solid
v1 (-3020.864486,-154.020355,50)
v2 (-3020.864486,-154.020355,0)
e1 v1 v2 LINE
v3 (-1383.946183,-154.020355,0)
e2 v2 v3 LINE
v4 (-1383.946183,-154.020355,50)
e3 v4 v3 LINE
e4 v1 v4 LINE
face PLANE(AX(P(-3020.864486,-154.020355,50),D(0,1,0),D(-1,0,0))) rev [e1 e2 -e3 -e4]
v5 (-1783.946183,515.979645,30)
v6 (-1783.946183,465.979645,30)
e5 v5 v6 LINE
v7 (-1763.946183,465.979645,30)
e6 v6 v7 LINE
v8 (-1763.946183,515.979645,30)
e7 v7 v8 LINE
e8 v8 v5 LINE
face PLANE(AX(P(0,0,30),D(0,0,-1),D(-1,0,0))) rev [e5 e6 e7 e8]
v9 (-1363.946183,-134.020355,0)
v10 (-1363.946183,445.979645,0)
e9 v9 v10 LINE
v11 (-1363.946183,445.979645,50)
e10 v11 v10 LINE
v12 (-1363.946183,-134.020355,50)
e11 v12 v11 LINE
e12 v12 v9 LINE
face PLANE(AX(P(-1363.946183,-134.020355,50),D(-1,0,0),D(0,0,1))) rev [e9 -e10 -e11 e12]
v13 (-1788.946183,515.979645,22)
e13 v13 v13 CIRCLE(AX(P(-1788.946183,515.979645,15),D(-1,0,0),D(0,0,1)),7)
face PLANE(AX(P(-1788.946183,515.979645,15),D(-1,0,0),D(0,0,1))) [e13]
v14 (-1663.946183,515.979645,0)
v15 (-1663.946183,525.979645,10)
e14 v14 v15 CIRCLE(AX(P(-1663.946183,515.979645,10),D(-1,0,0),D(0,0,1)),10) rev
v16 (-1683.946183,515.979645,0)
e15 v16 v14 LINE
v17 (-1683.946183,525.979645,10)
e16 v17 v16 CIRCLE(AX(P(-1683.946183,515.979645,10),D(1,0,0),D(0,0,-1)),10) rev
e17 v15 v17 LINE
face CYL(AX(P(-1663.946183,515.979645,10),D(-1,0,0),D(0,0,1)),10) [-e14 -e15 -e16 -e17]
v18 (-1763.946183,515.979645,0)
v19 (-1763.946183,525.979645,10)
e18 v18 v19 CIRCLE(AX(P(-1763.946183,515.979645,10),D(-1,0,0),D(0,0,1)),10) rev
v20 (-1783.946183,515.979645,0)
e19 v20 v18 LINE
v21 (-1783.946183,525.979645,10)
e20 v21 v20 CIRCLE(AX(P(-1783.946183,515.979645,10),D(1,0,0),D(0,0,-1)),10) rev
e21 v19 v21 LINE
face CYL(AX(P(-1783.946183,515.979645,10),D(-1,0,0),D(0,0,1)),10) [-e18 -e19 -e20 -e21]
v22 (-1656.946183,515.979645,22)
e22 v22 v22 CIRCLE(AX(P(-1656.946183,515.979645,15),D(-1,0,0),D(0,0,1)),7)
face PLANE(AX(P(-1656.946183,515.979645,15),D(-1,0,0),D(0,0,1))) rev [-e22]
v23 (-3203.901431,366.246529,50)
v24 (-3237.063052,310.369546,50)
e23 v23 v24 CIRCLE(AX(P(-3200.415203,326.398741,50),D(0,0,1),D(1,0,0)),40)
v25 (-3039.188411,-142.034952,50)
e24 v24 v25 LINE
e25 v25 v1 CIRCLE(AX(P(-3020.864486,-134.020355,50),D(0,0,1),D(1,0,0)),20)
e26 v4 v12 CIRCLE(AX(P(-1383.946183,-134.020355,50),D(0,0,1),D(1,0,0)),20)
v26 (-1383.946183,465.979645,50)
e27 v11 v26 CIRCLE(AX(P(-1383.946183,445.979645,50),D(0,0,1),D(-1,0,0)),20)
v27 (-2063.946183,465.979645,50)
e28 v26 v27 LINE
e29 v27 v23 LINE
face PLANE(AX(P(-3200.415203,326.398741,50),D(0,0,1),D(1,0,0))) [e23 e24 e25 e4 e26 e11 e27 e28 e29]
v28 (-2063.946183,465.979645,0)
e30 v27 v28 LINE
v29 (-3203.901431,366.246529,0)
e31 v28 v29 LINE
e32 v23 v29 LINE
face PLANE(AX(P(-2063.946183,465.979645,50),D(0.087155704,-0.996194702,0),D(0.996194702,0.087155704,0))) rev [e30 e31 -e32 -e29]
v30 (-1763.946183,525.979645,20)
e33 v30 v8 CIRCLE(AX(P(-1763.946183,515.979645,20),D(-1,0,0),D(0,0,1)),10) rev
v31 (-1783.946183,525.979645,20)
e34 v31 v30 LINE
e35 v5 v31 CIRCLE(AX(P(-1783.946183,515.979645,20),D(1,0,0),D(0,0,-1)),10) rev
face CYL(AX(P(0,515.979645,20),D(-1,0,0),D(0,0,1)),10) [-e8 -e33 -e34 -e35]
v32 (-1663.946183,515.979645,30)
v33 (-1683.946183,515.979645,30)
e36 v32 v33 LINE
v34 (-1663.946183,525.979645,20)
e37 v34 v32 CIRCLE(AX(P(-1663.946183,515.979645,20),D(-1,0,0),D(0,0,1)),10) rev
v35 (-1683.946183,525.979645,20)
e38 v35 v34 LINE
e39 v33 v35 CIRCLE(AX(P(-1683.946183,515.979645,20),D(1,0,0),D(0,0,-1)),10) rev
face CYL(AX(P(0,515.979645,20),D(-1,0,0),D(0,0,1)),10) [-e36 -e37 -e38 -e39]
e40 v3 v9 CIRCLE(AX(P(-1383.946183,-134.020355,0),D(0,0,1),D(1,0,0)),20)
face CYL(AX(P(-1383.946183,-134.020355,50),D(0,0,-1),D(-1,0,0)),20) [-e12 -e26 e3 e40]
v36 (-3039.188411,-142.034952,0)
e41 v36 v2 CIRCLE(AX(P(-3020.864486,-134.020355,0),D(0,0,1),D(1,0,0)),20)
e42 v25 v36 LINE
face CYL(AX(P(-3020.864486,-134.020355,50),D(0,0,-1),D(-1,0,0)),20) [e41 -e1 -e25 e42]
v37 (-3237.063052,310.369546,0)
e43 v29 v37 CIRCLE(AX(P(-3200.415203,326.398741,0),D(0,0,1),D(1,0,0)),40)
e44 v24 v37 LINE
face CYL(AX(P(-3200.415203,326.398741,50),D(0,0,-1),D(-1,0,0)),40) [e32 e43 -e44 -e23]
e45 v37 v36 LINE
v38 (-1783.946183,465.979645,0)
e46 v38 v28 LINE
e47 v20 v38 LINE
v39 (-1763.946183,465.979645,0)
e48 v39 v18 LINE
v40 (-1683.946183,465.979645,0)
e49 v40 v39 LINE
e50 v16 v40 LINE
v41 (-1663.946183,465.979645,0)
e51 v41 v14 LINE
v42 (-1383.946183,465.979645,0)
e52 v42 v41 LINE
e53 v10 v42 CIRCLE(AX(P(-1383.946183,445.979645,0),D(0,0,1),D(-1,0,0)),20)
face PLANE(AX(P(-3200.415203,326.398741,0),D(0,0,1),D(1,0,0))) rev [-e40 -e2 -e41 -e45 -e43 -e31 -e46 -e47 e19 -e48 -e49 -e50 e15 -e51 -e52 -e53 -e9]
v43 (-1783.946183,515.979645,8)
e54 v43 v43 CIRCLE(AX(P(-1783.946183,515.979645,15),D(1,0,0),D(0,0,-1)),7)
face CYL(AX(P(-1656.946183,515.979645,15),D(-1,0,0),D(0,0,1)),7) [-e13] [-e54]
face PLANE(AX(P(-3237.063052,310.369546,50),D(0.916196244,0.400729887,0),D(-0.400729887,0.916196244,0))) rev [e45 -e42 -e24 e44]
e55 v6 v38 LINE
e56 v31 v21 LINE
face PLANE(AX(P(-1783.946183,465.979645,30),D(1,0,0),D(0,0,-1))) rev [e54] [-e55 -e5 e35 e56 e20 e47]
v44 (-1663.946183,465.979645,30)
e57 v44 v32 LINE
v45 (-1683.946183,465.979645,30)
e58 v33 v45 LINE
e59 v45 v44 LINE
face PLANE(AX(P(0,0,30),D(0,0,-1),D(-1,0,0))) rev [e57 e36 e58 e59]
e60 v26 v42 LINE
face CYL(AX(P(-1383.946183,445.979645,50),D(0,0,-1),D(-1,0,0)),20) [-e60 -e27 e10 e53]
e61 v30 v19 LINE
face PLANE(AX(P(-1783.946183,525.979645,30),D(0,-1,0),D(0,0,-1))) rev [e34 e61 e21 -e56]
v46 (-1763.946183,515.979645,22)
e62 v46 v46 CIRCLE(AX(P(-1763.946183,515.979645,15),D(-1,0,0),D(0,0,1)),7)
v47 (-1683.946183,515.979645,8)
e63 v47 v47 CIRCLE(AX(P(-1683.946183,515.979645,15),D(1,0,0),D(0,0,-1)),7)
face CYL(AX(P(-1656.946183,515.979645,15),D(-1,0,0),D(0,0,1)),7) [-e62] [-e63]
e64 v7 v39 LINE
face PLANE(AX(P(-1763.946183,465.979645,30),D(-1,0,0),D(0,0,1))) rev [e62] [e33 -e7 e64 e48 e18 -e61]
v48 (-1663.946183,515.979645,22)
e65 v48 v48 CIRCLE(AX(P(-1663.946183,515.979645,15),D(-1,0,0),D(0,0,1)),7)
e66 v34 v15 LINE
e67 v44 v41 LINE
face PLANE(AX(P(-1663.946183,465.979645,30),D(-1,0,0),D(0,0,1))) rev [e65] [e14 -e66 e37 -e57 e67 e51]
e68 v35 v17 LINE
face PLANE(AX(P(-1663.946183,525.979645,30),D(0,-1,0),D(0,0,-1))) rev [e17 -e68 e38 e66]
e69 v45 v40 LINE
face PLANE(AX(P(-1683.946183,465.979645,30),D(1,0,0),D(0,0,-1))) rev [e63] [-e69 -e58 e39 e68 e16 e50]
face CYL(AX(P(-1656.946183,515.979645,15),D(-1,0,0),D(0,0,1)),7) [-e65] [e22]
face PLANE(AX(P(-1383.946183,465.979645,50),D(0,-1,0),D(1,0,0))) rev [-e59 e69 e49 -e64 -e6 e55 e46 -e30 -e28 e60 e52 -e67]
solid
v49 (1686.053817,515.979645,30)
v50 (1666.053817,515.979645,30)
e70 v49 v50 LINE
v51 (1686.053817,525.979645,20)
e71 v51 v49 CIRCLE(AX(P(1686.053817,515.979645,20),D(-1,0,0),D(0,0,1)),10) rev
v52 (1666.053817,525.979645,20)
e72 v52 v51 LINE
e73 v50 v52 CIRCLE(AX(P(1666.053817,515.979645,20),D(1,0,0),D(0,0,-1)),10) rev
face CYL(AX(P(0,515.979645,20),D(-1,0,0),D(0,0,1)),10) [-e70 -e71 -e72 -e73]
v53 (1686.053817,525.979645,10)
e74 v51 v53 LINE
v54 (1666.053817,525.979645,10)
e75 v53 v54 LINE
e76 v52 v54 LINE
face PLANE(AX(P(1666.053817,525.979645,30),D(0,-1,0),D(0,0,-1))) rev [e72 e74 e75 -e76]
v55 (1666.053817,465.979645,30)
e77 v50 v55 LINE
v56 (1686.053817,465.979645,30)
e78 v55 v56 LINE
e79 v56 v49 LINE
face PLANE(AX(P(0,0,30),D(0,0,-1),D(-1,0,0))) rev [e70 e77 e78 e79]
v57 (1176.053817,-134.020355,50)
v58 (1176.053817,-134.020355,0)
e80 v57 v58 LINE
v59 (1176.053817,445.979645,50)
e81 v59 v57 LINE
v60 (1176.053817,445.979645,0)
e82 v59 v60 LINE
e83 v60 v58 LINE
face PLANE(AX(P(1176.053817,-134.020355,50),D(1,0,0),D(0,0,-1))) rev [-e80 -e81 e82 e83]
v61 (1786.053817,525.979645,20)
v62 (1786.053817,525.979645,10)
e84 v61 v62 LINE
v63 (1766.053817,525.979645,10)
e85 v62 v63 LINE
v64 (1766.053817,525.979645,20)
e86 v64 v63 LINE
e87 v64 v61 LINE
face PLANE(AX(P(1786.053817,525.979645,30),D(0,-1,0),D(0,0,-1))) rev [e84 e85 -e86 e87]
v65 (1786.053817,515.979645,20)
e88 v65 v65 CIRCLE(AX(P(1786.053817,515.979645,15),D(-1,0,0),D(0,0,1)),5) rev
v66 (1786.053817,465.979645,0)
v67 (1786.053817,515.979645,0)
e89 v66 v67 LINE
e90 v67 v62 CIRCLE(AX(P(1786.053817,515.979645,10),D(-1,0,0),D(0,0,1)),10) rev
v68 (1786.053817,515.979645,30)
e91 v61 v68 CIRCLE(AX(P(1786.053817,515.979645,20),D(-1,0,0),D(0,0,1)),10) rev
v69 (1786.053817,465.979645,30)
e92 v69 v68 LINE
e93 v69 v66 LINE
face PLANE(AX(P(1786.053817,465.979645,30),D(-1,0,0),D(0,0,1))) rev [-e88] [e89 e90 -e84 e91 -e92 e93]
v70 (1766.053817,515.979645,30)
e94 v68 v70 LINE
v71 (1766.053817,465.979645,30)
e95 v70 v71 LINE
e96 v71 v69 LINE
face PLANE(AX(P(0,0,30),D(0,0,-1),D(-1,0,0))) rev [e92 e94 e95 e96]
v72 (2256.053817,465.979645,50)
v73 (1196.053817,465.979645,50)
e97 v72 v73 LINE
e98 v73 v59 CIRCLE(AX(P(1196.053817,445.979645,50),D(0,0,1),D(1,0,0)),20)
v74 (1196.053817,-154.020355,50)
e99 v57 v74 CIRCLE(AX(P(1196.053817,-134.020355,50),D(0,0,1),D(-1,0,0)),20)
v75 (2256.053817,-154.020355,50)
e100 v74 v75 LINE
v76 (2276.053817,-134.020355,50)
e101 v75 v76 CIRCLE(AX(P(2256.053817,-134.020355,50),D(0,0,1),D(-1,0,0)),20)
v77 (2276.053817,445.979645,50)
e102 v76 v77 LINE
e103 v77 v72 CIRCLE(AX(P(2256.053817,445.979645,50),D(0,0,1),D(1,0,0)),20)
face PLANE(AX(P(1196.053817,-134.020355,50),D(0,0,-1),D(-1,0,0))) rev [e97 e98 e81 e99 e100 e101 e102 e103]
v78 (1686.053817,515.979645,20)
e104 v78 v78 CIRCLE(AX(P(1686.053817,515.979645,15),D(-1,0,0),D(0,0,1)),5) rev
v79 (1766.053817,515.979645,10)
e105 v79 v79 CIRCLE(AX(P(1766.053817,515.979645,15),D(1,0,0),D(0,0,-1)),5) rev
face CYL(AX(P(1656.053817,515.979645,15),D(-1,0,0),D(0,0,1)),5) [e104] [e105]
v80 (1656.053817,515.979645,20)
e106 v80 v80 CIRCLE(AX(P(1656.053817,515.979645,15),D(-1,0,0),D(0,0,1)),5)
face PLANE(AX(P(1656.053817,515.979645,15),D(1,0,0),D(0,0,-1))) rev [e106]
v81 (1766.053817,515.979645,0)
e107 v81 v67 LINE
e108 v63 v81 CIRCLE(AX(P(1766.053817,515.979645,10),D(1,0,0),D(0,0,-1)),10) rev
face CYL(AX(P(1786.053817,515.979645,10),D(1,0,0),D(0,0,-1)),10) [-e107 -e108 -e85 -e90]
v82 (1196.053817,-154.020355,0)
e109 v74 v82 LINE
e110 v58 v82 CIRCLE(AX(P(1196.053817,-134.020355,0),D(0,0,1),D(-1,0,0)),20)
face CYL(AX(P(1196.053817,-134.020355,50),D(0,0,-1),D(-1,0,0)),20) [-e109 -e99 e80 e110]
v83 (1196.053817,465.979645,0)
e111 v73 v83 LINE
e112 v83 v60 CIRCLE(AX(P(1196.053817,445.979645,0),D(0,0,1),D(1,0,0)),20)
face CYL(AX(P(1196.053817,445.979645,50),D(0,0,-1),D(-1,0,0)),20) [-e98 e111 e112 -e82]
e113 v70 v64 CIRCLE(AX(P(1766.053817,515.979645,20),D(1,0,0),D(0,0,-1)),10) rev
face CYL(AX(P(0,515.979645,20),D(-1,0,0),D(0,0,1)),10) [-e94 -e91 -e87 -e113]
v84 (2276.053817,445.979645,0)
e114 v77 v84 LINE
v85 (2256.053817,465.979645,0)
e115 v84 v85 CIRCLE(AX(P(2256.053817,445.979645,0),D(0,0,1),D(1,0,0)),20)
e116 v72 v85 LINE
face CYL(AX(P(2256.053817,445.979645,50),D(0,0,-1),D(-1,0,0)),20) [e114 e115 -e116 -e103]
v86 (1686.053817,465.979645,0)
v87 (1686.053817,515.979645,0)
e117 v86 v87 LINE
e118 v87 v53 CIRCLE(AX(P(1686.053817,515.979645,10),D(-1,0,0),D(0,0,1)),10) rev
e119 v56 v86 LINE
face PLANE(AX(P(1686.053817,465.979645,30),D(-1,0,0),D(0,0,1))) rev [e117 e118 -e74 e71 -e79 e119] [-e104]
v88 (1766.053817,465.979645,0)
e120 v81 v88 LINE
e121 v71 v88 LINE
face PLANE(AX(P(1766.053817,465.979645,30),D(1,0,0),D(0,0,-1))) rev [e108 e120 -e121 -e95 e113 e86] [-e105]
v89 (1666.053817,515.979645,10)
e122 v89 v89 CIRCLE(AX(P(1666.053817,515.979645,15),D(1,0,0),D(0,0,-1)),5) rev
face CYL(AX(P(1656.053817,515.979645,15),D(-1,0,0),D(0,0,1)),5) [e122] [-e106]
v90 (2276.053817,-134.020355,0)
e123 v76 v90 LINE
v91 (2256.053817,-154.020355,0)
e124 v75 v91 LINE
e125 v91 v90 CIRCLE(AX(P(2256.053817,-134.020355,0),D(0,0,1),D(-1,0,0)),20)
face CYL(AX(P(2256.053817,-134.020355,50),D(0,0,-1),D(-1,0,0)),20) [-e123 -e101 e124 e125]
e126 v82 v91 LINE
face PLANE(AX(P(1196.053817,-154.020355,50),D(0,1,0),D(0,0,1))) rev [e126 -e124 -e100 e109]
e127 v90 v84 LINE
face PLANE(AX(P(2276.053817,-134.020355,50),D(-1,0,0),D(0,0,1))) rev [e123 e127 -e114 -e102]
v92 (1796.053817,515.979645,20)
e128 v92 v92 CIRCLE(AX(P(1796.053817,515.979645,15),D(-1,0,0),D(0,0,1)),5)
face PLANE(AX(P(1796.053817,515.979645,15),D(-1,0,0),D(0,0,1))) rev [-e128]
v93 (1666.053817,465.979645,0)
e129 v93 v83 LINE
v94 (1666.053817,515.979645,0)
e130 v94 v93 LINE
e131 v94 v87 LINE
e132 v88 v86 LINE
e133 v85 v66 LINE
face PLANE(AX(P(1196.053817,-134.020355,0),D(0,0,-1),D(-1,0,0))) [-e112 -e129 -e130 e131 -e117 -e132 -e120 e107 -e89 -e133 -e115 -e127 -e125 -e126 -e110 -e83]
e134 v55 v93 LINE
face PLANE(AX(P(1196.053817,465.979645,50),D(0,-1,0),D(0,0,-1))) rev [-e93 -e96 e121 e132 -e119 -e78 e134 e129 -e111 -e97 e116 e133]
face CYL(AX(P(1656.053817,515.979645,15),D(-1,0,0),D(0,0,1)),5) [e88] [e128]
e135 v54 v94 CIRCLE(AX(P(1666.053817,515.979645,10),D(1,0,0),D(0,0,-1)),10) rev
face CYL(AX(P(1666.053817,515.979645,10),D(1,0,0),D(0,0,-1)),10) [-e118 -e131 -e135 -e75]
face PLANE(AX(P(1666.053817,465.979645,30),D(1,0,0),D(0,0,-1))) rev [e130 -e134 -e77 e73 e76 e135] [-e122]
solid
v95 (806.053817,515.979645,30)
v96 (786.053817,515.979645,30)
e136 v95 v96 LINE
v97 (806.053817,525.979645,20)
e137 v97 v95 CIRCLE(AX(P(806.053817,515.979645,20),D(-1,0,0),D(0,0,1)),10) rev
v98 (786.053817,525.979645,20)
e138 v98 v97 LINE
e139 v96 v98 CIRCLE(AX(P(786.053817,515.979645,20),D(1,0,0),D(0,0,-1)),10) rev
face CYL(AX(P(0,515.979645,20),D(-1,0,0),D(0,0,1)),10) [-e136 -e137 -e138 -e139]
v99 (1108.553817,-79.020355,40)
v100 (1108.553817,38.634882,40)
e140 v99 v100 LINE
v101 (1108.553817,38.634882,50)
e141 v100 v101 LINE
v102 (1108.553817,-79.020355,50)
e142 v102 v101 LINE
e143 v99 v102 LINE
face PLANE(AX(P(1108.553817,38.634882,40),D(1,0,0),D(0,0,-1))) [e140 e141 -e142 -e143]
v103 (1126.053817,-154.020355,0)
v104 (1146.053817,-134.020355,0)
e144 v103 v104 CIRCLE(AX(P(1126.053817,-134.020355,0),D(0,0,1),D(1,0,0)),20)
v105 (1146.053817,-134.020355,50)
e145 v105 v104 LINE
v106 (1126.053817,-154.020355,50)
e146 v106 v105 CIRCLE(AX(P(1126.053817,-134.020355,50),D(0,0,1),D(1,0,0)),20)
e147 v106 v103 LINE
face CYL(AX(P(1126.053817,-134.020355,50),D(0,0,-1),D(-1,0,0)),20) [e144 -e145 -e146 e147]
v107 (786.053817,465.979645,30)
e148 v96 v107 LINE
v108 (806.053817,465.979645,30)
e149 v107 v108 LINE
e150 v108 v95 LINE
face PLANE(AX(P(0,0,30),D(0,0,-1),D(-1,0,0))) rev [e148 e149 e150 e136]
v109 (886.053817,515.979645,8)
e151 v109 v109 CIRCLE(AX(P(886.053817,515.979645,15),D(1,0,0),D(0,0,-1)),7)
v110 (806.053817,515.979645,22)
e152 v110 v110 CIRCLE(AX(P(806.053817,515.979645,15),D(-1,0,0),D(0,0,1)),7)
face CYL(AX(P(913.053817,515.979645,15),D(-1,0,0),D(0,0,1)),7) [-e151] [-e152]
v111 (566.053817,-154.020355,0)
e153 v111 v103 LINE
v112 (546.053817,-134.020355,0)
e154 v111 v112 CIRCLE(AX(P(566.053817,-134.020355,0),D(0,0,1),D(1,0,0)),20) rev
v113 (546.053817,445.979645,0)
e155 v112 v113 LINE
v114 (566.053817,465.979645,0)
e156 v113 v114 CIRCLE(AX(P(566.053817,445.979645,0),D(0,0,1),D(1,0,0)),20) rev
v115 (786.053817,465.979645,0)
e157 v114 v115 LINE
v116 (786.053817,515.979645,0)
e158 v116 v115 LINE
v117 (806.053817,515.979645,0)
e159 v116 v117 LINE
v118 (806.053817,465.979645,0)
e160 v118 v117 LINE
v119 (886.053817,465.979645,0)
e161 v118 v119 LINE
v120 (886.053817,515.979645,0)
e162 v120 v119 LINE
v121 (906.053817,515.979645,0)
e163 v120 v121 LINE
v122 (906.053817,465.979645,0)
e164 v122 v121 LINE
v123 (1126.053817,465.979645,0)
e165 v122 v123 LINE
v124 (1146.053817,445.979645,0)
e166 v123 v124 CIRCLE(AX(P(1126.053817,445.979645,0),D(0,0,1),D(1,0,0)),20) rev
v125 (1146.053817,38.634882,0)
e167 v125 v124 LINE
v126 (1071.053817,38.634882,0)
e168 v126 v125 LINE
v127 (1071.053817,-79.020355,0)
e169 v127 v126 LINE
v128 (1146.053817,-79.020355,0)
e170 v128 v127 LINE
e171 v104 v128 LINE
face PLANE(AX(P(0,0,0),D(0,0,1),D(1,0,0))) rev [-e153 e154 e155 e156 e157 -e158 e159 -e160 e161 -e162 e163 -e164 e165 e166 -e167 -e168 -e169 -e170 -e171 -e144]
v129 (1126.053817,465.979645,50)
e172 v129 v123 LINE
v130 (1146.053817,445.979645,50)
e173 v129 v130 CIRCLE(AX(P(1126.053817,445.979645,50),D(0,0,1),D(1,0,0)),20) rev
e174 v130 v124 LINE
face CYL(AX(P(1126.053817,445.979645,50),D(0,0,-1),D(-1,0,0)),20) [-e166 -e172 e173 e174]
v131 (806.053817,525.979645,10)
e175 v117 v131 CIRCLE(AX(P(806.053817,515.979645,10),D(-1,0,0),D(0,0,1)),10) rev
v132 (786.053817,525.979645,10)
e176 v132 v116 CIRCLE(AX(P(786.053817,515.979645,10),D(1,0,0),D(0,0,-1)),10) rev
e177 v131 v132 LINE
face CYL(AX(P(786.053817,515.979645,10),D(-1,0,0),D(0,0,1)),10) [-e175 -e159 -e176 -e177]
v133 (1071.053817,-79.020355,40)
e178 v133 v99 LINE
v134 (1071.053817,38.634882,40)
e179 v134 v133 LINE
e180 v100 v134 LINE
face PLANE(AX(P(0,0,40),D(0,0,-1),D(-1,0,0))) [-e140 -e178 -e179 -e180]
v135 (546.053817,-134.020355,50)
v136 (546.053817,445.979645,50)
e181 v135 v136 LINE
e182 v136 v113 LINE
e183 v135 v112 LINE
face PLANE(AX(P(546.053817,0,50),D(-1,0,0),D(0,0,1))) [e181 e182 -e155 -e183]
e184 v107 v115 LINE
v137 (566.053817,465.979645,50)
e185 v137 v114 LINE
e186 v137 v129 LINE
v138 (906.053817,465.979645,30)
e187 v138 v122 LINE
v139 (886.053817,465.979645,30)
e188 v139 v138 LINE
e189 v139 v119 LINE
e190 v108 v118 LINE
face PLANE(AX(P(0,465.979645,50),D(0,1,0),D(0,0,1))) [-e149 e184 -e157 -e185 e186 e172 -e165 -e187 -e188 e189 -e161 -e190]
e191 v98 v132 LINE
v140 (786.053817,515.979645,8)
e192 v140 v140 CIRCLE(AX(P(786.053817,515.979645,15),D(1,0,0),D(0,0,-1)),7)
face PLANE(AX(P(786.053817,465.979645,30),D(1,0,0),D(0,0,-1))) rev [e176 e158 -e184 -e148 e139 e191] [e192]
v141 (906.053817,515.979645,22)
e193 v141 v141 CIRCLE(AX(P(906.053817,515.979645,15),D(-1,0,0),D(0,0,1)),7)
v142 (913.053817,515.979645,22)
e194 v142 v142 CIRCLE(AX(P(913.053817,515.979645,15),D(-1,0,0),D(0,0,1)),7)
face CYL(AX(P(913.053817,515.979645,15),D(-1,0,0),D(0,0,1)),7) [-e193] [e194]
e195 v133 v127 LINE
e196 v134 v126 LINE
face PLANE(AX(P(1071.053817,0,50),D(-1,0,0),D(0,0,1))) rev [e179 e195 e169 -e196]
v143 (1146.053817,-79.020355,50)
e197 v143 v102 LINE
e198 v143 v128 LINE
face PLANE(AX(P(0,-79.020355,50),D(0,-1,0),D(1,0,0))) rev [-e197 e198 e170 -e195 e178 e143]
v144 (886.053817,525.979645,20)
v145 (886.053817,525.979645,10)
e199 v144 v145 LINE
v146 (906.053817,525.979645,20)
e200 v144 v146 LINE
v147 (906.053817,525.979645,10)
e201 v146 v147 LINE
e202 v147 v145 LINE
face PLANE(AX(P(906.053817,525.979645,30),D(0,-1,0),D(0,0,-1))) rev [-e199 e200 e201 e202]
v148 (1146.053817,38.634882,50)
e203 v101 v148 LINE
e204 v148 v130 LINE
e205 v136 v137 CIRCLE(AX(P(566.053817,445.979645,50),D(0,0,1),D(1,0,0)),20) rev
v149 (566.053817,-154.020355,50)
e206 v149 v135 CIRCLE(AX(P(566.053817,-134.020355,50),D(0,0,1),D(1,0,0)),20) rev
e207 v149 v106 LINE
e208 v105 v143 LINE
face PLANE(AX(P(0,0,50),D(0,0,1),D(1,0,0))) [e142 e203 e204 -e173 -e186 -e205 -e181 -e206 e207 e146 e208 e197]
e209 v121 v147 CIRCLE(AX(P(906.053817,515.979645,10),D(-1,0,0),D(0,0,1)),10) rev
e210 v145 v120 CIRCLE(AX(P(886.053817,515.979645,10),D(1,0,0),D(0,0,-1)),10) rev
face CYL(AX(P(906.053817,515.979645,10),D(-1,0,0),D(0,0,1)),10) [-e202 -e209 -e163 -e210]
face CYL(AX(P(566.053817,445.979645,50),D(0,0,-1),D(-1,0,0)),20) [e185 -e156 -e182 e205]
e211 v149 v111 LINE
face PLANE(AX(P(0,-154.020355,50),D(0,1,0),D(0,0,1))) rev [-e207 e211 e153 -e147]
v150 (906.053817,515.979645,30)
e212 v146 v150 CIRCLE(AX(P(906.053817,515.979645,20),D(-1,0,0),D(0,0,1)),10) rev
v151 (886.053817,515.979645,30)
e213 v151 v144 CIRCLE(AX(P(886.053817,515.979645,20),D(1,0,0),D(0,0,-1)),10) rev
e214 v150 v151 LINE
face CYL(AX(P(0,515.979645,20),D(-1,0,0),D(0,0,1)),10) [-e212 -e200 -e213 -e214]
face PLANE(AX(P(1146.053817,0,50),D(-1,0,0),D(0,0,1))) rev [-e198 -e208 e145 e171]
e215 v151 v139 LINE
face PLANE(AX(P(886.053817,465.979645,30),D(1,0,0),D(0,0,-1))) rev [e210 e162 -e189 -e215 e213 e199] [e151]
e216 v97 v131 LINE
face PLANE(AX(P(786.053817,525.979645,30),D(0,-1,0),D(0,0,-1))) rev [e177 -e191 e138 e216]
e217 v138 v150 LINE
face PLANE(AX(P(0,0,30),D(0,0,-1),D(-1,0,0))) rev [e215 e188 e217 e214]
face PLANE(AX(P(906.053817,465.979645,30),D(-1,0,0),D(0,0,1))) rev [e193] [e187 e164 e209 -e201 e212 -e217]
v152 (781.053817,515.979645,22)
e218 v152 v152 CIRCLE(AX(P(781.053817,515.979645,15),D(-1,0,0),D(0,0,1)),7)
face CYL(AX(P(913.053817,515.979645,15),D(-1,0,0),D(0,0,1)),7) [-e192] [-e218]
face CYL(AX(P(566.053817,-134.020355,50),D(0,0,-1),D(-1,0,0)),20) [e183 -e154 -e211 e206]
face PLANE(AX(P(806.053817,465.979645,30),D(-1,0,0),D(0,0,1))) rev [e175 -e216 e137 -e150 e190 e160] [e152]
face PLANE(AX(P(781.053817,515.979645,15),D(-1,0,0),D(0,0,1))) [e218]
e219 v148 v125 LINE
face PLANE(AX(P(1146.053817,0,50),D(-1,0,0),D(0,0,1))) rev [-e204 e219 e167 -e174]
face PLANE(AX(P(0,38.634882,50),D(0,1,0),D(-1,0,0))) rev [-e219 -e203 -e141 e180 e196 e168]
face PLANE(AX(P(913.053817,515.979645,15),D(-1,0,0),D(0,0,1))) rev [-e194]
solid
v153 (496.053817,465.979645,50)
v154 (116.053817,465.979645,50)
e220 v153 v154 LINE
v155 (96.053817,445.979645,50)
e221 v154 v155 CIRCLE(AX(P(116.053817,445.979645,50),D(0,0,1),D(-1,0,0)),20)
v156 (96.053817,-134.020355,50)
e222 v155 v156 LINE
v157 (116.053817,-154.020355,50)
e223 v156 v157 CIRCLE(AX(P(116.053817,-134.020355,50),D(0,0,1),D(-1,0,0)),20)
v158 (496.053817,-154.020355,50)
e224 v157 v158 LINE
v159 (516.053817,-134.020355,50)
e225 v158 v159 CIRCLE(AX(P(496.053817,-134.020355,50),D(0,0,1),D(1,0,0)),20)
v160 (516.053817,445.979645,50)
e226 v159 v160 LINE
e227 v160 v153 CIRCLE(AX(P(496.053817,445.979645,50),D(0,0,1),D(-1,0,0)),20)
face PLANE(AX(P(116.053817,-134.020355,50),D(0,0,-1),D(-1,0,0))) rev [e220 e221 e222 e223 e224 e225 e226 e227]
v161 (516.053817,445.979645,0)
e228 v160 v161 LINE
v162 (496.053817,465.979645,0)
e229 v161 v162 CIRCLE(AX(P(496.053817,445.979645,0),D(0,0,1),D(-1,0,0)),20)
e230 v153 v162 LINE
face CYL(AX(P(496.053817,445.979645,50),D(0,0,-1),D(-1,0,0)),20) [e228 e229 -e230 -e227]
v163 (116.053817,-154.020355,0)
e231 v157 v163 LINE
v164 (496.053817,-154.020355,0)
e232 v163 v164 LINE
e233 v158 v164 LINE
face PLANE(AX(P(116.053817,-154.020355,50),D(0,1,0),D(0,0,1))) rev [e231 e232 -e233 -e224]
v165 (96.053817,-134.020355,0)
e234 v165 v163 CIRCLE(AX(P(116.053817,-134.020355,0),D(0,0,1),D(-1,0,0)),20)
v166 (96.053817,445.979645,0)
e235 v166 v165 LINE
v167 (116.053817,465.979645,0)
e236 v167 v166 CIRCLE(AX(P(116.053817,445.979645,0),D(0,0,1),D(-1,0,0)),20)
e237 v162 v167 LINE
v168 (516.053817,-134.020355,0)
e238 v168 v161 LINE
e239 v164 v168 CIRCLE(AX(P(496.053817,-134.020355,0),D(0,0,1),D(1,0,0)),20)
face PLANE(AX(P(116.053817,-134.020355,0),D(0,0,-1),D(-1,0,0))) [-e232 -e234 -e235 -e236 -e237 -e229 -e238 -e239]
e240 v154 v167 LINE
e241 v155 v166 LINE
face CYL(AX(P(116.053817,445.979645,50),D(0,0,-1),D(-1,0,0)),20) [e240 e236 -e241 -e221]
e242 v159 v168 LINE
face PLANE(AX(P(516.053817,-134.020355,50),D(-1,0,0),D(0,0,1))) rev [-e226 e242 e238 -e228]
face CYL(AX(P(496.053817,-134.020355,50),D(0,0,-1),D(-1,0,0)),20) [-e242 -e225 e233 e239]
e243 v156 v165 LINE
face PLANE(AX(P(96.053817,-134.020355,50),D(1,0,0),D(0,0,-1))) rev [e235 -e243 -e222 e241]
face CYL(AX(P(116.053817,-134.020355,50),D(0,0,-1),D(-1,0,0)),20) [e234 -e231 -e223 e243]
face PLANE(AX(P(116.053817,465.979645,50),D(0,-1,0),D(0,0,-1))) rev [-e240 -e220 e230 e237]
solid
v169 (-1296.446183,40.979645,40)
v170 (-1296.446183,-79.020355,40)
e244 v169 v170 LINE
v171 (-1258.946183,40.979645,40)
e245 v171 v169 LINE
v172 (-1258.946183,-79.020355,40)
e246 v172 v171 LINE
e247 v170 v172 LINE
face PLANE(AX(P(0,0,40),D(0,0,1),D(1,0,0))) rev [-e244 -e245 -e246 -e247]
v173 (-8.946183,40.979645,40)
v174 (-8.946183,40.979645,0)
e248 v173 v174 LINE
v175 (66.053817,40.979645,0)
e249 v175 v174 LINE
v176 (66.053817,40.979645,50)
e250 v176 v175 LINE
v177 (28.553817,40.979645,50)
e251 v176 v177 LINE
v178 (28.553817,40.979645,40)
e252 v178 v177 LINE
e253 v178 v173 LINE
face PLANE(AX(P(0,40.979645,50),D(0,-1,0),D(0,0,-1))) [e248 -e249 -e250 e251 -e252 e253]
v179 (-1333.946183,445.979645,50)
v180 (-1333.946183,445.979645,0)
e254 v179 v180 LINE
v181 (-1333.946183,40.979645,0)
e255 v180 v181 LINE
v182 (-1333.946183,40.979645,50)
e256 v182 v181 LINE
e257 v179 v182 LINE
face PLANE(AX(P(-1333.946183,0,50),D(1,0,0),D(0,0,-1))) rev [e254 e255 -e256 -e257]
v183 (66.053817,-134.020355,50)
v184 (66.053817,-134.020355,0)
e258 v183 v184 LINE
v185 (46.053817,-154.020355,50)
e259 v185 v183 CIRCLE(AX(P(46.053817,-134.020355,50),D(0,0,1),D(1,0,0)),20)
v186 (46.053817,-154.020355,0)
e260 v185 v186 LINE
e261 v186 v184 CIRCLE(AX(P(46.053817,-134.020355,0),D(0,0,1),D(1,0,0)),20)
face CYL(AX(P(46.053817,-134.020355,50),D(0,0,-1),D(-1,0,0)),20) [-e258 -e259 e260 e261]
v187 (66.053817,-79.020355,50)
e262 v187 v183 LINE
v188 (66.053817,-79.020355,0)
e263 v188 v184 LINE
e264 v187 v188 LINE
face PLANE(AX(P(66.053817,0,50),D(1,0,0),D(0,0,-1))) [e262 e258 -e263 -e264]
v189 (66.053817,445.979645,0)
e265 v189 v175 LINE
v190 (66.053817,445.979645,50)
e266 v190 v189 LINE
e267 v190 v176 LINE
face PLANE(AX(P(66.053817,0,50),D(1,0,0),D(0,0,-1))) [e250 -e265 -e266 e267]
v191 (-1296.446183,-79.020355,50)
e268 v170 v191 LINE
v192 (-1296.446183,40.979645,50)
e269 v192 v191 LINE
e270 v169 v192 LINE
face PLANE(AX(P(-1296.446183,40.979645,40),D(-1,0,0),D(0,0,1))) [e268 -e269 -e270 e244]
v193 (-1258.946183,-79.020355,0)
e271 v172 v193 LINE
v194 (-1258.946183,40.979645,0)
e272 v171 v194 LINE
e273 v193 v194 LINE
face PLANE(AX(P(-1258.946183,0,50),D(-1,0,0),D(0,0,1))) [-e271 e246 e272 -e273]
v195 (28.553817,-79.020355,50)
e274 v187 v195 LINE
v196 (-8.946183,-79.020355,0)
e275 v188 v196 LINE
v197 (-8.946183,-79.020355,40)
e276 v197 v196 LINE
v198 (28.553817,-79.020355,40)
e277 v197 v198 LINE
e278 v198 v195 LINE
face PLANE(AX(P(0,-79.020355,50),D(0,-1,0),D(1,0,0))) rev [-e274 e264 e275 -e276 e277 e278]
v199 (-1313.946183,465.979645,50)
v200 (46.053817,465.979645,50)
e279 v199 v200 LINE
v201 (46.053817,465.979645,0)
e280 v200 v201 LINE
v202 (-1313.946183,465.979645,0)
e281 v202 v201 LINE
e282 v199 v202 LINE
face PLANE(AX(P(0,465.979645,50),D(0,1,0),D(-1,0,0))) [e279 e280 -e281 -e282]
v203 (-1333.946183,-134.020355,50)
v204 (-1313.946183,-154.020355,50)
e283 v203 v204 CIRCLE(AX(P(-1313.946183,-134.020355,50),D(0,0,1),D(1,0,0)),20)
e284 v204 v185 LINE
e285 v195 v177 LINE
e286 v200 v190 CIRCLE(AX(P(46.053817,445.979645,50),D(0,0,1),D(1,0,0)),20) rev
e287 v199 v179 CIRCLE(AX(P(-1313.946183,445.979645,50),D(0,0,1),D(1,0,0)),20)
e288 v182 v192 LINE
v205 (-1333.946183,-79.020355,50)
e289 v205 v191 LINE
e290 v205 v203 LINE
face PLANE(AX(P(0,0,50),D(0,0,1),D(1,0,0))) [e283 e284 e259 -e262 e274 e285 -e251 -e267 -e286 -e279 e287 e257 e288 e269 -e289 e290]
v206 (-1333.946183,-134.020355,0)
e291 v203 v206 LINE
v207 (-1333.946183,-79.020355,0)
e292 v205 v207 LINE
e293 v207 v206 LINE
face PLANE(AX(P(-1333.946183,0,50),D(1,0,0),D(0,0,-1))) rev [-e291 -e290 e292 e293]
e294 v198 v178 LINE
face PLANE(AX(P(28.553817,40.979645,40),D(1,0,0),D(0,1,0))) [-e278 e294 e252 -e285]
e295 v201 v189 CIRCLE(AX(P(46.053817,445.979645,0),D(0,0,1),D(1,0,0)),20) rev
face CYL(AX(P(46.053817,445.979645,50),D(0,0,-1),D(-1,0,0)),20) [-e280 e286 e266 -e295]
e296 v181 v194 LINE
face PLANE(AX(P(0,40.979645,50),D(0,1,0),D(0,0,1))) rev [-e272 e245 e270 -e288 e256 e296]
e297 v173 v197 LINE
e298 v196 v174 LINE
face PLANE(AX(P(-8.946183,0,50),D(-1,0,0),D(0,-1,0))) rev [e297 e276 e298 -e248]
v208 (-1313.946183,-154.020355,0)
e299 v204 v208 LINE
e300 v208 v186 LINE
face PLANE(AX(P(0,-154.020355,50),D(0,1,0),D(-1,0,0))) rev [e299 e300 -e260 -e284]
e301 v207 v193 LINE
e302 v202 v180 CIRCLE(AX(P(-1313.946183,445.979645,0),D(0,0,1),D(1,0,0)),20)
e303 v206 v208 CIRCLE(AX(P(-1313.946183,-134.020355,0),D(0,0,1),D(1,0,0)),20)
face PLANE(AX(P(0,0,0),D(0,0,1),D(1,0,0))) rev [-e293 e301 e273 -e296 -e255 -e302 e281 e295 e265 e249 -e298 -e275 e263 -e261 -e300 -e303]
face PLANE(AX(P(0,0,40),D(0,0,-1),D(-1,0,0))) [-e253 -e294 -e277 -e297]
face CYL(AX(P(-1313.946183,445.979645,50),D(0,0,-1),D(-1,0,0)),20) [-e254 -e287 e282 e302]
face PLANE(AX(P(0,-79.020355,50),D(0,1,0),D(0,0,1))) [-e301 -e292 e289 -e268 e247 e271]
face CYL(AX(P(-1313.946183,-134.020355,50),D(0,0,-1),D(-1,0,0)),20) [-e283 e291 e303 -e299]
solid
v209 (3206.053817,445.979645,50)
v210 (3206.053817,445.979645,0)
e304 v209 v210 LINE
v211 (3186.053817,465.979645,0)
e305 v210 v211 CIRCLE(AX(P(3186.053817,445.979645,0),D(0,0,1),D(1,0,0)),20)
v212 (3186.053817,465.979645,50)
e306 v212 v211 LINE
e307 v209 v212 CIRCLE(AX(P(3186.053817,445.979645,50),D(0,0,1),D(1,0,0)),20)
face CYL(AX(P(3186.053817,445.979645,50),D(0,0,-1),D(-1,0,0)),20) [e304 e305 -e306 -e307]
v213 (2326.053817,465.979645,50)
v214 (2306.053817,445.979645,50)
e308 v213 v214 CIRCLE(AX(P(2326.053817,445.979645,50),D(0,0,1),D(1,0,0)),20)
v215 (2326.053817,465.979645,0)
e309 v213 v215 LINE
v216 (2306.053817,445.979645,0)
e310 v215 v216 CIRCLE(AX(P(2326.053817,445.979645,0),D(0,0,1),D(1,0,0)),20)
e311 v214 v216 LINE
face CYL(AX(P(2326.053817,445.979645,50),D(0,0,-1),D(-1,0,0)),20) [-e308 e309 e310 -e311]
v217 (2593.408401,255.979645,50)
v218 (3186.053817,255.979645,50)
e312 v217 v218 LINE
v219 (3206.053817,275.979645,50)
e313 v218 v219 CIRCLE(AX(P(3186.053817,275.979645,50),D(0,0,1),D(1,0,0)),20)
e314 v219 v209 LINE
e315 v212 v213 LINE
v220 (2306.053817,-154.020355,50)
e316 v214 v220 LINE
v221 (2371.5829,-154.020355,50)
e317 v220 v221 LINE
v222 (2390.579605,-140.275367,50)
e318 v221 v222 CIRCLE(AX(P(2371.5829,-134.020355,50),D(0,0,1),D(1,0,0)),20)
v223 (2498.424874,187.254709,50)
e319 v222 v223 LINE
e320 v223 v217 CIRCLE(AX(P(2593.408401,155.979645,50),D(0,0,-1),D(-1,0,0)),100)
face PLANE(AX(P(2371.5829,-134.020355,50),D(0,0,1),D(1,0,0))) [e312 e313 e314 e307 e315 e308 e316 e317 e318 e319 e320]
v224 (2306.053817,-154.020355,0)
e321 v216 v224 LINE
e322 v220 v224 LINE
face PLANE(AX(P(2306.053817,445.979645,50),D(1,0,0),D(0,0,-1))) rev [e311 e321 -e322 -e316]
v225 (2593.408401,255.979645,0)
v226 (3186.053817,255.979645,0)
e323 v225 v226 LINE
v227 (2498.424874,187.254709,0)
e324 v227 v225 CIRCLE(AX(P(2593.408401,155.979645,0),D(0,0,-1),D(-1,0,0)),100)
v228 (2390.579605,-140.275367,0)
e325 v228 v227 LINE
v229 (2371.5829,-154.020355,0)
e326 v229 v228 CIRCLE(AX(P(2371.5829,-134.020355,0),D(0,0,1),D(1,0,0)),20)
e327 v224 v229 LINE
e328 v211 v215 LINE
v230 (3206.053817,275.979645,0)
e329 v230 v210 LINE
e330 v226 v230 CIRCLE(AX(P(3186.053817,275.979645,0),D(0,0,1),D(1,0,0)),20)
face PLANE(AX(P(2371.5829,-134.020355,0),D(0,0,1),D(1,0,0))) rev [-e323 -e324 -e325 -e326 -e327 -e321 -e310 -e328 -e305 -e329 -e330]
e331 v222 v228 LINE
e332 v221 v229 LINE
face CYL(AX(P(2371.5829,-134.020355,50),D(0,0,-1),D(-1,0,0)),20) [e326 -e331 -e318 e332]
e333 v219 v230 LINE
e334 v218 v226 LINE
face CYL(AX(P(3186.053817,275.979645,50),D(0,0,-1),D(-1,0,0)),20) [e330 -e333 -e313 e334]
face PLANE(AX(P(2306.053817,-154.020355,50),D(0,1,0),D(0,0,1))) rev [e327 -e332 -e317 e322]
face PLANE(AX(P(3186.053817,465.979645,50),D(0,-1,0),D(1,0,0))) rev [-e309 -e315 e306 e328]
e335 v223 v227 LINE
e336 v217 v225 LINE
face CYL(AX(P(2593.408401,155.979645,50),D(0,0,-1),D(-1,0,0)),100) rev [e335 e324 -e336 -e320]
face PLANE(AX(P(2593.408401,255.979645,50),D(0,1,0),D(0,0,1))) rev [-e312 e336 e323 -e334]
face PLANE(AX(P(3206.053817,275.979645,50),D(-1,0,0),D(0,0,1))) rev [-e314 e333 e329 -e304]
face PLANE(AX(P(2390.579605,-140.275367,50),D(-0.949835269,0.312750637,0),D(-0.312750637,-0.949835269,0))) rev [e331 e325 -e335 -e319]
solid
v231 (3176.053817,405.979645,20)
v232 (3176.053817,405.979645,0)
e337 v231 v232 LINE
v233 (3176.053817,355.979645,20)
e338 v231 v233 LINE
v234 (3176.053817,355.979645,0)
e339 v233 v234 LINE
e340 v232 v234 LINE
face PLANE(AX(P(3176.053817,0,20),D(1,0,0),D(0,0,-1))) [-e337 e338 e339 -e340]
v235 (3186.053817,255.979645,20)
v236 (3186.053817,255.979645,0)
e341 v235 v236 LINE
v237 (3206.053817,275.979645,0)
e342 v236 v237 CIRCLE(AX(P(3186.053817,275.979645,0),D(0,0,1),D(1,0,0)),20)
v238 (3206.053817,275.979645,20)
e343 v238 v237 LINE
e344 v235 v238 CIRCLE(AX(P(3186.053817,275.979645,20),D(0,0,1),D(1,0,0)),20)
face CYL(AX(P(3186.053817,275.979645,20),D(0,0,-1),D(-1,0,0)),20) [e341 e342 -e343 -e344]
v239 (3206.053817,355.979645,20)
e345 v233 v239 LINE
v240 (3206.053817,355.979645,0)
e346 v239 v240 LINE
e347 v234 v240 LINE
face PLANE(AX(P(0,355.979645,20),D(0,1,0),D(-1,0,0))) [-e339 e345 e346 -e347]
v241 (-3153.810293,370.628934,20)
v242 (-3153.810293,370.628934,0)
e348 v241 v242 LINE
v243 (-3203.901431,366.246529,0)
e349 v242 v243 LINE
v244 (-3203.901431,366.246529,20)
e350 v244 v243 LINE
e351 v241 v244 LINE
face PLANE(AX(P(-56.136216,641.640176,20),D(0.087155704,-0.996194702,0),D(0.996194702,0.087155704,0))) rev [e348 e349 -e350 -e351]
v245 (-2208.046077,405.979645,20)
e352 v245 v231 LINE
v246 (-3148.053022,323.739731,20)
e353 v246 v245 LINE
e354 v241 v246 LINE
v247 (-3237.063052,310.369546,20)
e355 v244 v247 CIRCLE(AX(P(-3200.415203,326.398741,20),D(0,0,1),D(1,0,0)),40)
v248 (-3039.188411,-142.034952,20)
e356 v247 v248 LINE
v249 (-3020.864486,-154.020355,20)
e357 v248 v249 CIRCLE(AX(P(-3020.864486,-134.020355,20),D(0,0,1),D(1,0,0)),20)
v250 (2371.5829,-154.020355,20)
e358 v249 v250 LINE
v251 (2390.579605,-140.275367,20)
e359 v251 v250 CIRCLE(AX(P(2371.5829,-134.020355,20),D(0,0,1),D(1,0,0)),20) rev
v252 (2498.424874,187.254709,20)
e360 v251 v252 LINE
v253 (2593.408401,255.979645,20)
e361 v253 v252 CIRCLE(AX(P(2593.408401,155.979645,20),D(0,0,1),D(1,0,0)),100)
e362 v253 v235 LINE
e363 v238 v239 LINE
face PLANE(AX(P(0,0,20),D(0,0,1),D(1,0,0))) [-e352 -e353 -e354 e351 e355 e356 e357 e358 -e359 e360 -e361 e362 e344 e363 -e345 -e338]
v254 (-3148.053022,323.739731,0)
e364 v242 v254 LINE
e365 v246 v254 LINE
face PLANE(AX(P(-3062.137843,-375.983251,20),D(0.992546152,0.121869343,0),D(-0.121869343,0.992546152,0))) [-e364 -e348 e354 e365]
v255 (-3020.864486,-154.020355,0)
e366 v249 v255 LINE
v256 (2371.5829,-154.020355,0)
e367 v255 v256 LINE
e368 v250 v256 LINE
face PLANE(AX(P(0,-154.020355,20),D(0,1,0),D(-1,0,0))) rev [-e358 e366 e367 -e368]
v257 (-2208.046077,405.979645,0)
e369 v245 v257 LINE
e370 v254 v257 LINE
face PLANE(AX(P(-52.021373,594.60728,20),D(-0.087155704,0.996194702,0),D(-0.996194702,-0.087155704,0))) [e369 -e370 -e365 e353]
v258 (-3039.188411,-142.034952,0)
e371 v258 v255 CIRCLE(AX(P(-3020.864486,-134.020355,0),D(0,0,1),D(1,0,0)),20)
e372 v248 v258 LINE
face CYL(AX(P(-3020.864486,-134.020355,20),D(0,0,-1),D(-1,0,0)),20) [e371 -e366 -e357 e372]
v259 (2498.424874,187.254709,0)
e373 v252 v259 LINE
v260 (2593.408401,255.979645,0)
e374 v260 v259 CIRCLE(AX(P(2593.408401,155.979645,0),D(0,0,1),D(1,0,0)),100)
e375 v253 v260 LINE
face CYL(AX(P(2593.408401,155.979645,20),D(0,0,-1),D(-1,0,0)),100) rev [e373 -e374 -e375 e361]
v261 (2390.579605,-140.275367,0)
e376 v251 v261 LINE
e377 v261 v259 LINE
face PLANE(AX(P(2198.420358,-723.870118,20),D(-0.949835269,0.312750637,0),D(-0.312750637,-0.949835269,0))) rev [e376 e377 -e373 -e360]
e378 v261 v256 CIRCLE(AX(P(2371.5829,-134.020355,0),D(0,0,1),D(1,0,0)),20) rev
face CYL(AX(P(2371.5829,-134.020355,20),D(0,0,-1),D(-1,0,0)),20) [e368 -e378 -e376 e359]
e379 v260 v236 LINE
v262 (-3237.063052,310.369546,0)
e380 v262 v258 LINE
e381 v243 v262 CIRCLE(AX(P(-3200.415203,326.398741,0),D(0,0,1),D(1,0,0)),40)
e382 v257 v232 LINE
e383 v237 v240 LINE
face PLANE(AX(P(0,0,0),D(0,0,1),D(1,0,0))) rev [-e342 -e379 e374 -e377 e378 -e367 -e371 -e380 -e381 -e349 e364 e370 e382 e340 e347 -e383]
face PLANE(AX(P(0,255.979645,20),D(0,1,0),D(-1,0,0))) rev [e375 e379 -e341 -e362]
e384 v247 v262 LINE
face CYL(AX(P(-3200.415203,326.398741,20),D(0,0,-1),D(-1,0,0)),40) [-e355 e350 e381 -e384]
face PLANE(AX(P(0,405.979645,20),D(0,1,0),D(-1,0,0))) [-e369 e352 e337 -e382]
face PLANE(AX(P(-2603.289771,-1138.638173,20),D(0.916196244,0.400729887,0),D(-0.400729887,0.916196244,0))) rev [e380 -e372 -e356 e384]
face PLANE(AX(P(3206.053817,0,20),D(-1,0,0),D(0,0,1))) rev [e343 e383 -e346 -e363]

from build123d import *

# Parameters (mm, degrees)
Y_KSEKLIK_EKSTR_ZYON1_DEPTH       = 50
Y_KSEKLIK_EKSTR_ZYON2_DEPTH       = 50
Y_KSEKLIK_EKSTR_ZYON3_DEPTH       = 50
Y_KSEKLIK_EKSTR_ZYON4_DEPTH       = 50
Y_KSEKLIK_EKSTR_ZYON5_DEPTH       = 50
Y_KSEKLIK_EKSTR_ZYON6_DEPTH       = 50
Y_KSEKLIK_EKSTR_ZYON7_DEPTH       = 20
IZIM8_W                           = 37.5
IZIM8_H                           = 120
IZIM8_H_2                         = 117.655236588
Y_KSEKLIK_EKSTR_ZYON8_DEPTH       = 10
IZIM9_W                           = 20
IZIM9_H                           = 60
Y_KSEKLIK_EKSTR_ZYON9_DEPTH       = 30
RADYUS1_R                         = 10
RADYUS2_R                         = 10
RADYUS3_R                         = 10
KES_EKSTR_ZYON1_DEPTH             = 3594
KES_EKSTR_ZYON1_DEPTH_BACK        = 3594
IZIM10_R                          = 5
Y_KSEKLIK_EKSTR_ZYON11_DEPTH      = 5
Y_KSEKLIK_EKSTR_ZYON11_DEPTH_BACK = 127
IZIM14_R                          = 7
Y_KSEKLIK_EKSTR_ZYON12_DEPTH      = 5
Y_KSEKLIK_EKSTR_ZYON12_DEPTH_BACK = 127
IZIM16_R                          = 7


# Read off the part's stored shape, not the designer's step: Yükseklik-Ekstrüzyon7
with BuildPart() as part:
    # Çizim1 → Yükseklik-Ekstrüzyon1 (new body)
    with BuildSketch(Plane.XY):
        with BuildLine():
            Line((3186.053816649, 465.979645309), (2326.053816649, 465.979645309))
            ThreePointArc((2326.053816649, 465.979645309), (2311.911681025, 460.121780932), (2306.053816649, 445.979645309))
            Line((2306.053816649, 445.979645309), (2306.053816649, -154.020354691))
            Line((2306.053816649, -154.020354691), (2371.582899748, -154.020354691))
            ThreePointArc((2371.582899748, -154.020354691), (2383.30680151, -150.223753331), (2390.579605134, -140.27536744))
            Line((2390.579605134, -140.27536744), (2498.424874223, 187.254709053))
            ThreePointArc((2498.424874223, 187.254709053), (2534.788892345, 236.996638509), (2593.408401152, 255.979645309))
            Line((2593.408401152, 255.979645309), (3186.053816649, 255.979645309))
            ThreePointArc((3186.053816649, 255.979645309), (3200.195952273, 261.837509685), (3206.053816649, 275.979645309))
            Line((3206.053816649, 275.979645309), (3206.053816649, 445.979645309))
            ThreePointArc((3206.053816649, 445.979645309), (3200.195952273, 460.121780932), (3186.053816649, 465.979645309))
        make_face()
    extrude(amount=Y_KSEKLIK_EKSTR_ZYON1_DEPTH)


with BuildPart() as body_2:
    # Çizim2 → Yükseklik-Ekstrüzyon2 (new body)
    with BuildSketch(Plane.XY):
        with BuildLine():
            Line((1196.053816649, -154.020354691), (2256.053816649, -154.020354691))
            ThreePointArc((2256.053816649, -154.020354691), (2270.195952273, -148.162490315), (2276.053816649, -134.020354691))
            Line((2276.053816649, -134.020354691), (2276.053816649, 445.979645309))
            ThreePointArc((2276.053816649, 445.979645309), (2270.195952273, 460.121780932), (2256.053816649, 465.979645309))
            Line((2256.053816649, 465.979645309), (1196.053816649, 465.979645309))
            ThreePointArc((1196.053816649, 465.979645309), (1181.911681025, 460.121780932), (1176.053816649, 445.979645309))
            Line((1176.053816649, 445.979645309), (1176.053816649, -134.020354691))
            ThreePointArc((1176.053816649, -134.020354691), (1181.911681025, -148.162490315), (1196.053816649, -154.020354691))
        make_face()
    extrude(amount=Y_KSEKLIK_EKSTR_ZYON2_DEPTH)



with BuildPart() as body_3:
    # Çizim3 → Yükseklik-Ekstrüzyon3 (new body)
    with BuildSketch(Plane.XY):
        with BuildLine():
            ThreePointArc((546.053816649, -134.020354691), (551.911681025, -148.162490315), (566.053816649, -154.020354691))
            Line((566.053816649, -154.020354691), (1126.053816649, -154.020354691))
            ThreePointArc((1126.053816649, -154.020354691), (1140.195952273, -148.162490315), (1146.053816649, -134.020354691))
            Line((1146.053816649, -134.020354691), (1146.053816649, -79.020354691))
            Line((1146.053816649, -79.020354691), (1071.053816649, -79.020354691))
            Line((1071.053816649, -79.020354691), (1071.053816649, 38.634881897))
            Line((1071.053816649, 38.634881897), (1146.053816649, 38.634881897))
            Line((1146.053816649, 38.634881897), (1146.053816649, 445.979645309))
            ThreePointArc((1146.053816649, 445.979645309), (1140.195952273, 460.121780932), (1126.053816649, 465.979645309))
            Line((1126.053816649, 465.979645309), (566.053816649, 465.979645309))
            ThreePointArc((566.053816649, 465.979645309), (551.911681025, 460.121780932), (546.053816649, 445.979645309))
            Line((546.053816649, 445.979645309), (546.053816649, -134.020354691))
        make_face()
    extrude(amount=Y_KSEKLIK_EKSTR_ZYON3_DEPTH)



with BuildPart() as body_4:
    # Çizim4 → Yükseklik-Ekstrüzyon4 (new body)
    with BuildSketch(Plane.XY):
        with BuildLine():
            Line((116.053816649, -154.020354691), (496.053816649, -154.020354691))
            ThreePointArc((496.053816649, -154.020354691), (510.195952273, -148.162490315), (516.053816649, -134.020354691))
            Line((516.053816649, -134.020354691), (516.053816649, 445.979645309))
            ThreePointArc((516.053816649, 445.979645309), (510.195952273, 460.121780932), (496.053816649, 465.979645309))
            Line((496.053816649, 465.979645309), (116.053816649, 465.979645309))
            ThreePointArc((116.053816649, 465.979645309), (101.911681025, 460.121780932), (96.053816649, 445.979645309))
            Line((96.053816649, 445.979645309), (96.053816649, -134.020354691))
            ThreePointArc((96.053816649, -134.020354691), (101.911681025, -148.162490315), (116.053816649, -154.020354691))
        make_face()
    extrude(amount=Y_KSEKLIK_EKSTR_ZYON4_DEPTH)


with BuildPart() as body_5:
    # Çizim5 → Yükseklik-Ekstrüzyon5 (new body)
    with BuildSketch(Plane.XY):
        with BuildLine():
            Line((46.053816649, 465.979645309), (-1313.946183351, 465.979645309))
            ThreePointArc((-1313.946183351, 465.979645309), (-1328.088318975, 460.121780932), (-1333.946183351, 445.979645309))
            Line((-1333.946183351, 445.979645309), (-1333.946183351, 40.979645309))
            Line((-1333.946183351, 40.979645309), (-1258.946183351, 40.979645309))
            Line((-1258.946183351, 40.979645309), (-1258.946183351, -79.020354691))
            Line((-1258.946183351, -79.020354691), (-1333.946183351, -79.020354691))
            Line((-1333.946183351, -79.020354691), (-1333.946183351, -134.020354691))
            ThreePointArc((-1333.946183351, -134.020354691), (-1328.088318975, -148.162490315), (-1313.946183351, -154.020354691))
            Line((-1313.946183351, -154.020354691), (46.053816649, -154.020354691))
            ThreePointArc((46.053816649, -154.020354691), (60.195952273, -148.162490315), (66.053816649, -134.020354691))
            Line((66.053816649, -134.020354691), (66.053816649, -79.020354691))
            Line((66.053816649, -79.020354691), (-8.946183351, -79.020354691))
            Line((-8.946183351, -79.020354691), (-8.946183351, 40.979645309))
            Line((-8.946183351, 40.979645309), (66.053816649, 40.979645309))
            Line((66.053816649, 40.979645309), (66.053816649, 445.979645309))
            ThreePointArc((66.053816649, 445.979645309), (60.195952273, 460.121780932), (46.053816649, 465.979645309))
        make_face()
    extrude(amount=Y_KSEKLIK_EKSTR_ZYON5_DEPTH)


with BuildPart() as body_6:
    # Çizim6 → Yükseklik-Ekstrüzyon6 (new body)
    with BuildSketch(Plane.XY):
        with BuildLine():
            Line((-1383.946183351, 465.979645309), (-2063.946183351, 465.979645309))
            Line((-2063.946183351, 465.979645309), (-3203.901430875, 366.246529353))
            ThreePointArc((-3203.901430875, 366.246529353), (-3234.813536631, 346.813310229), (-3237.063052486, 310.369545793))
            Line((-3237.063052486, 310.369545793), (-3039.188410578, -142.034952441))
            ThreePointArc((-3039.188410578, -142.034952441), (-3031.812271893, -150.757916566), (-3020.864485701, -154.020354691))
            Line((-3020.864485701, -154.020354691), (-1383.946183351, -154.020354691))
            ThreePointArc((-1383.946183351, -154.020354691), (-1369.804047727, -148.162490315), (-1363.946183351, -134.020354691))
            Line((-1363.946183351, -134.020354691), (-1363.946183351, 445.979645309))
            ThreePointArc((-1363.946183351, 445.979645309), (-1369.804047727, 460.121780932), (-1383.946183351, 465.979645309))
        make_face()
    extrude(amount=Y_KSEKLIK_EKSTR_ZYON6_DEPTH)


with BuildPart() as body_7:
    # Yükseklik-Ekstrüzyon7 outline → Yükseklik-Ekstrüzyon7 (new body)
    with BuildSketch(Plane.XY):
        with BuildLine():
            Line((3206.053816649, 275.979645309), (3206.053816649, 355.979645309))
            Line((3206.053816649, 355.979645309), (3176.053816649, 355.979645309))
            Line((3176.053816649, 355.979645309), (3176.053816649, 405.979645309))
            Line((3176.053816649, 405.979645309), (-2208.046077191, 405.979645309))
            Line((-2208.046077191, 405.979645309), (-3148.053022498, 323.739731172))
            Line((-3148.053022498, 323.739731172), (-3153.810292691, 370.628934104))
            Line((-3153.810292691, 370.628934104), (-3203.901430875, 366.246529353))
            ThreePointArc((-3203.901430875, 366.246529353), (-3234.813536631, 346.813310229), (-3237.063052486, 310.369545793))
            Line((-3237.063052486, 310.369545793), (-3039.188410578, -142.034952441))
            ThreePointArc((-3039.188410578, -142.034952441), (-3031.812271893, -150.757916566), (-3020.864485701, -154.020354691))
            Line((-3020.864485701, -154.020354691), (2371.582899748, -154.020354691))
            ThreePointArc((2371.582899748, -154.020354691), (2383.30680151, -150.223753331), (2390.579605134, -140.27536744))
            Line((2390.579605134, -140.27536744), (2498.424874223, 187.254709053))
            ThreePointArc((2498.424874223, 187.254709053), (2534.788892345, 236.996638509), (2593.408401152, 255.979645309))
            Line((2593.408401152, 255.979645309), (3186.053816649, 255.979645309))
            ThreePointArc((3186.053816649, 255.979645309), (3200.195952273, 261.837509685), (3206.053816649, 275.979645309))
        make_face()
    extrude(amount=Y_KSEKLIK_EKSTR_ZYON7_DEPTH)


with BuildPart() as body_3_1:
    add(body_3.part)

    add(body_5.part)  # Yükseklik-Ekstrüzyon8 merges body 5
    # Çizim8 → Yükseklik-Ekstrüzyon8 (add)
    with BuildSketch(Plane.XY.offset(50)):
        with Locations((-1277.696183351, -19.020354691)):
            Rectangle(IZIM8_W, IZIM8_H)
        with Locations((9.803816649, -19.020354691)):
            Rectangle(IZIM8_W, IZIM8_H)
        with Locations((1089.803816649, -20.192736397)):
            Rectangle(IZIM8_W, IZIM8_H_2)
    extrude(amount=-Y_KSEKLIK_EKSTR_ZYON8_DEPTH)


with BuildPart() as body_2_1:
    add(body_2.part)

    add(body_3_1.part)  # Yükseklik-Ekstrüzyon9 merges body 3

    add(body_6.part)  # Yükseklik-Ekstrüzyon9 merges body 6
    # Çizim9 → Yükseklik-Ekstrüzyon9 (add)
    with BuildSketch(Plane.XY):
        with Locations((-1673.946183351, 495.979645309)):
            Rectangle(IZIM9_W, IZIM9_H)
        with Locations((-1773.946183351, 495.979645309)):
            Rectangle(IZIM9_W, IZIM9_H)
        with Locations((896.053816649, 495.979645309)):
            Rectangle(IZIM9_W, IZIM9_H)
        with Locations((796.053816649, 495.979645309)):
            Rectangle(IZIM9_W, IZIM9_H)
        with Locations((1776.053816649, 495.979645309)):
            Rectangle(IZIM9_W, IZIM9_H)
        with Locations((1676.053816649, 495.979645309)):
            Rectangle(IZIM9_W, IZIM9_H)
    extrude(amount=Y_KSEKLIK_EKSTR_ZYON9_DEPTH)

    # Radyus1
    radyus1_edges = [body_2_1.edges().sort_by_distance(p)[0] for p in [
        (796.053816649, 525.979645309, 0),
        (796.053816649, 525.979645309, 30),
        (896.053816649, 525.979645309, 0),
        (896.053816649, 525.979645309, 30),
    ]]
    fillet(radyus1_edges, radius=RADYUS1_R)

    # Radyus2
    radyus2_edges = [body_2_1.edges().sort_by_distance(p)[0] for p in [
        (-1773.946183351, 525.979645309, 0),
        (-1773.946183351, 525.979645309, 30),
        (-1673.946183351, 525.979645309, 0),
        (-1673.946183351, 525.979645309, 30),
    ]]
    fillet(radyus2_edges, radius=RADYUS2_R)

    # Radyus3
    radyus3_edges = [body_2_1.edges().sort_by_distance(p)[0] for p in [
        (1676.053816649, 525.979645309, 0),
        (1676.053816649, 525.979645309, 30),
        (1776.053816649, 525.979645309, 0),
        (1776.053816649, 525.979645309, 30),
    ]]
    fillet(radyus3_edges, radius=RADYUS3_R)

    # Çizim10 → Kes-Ekstrüzyon1 (cut, two sides: drawn at the far end of the back side and taken through both)
    with BuildSketch(Plane.ZY.offset(-1766.053816649).offset(-KES_EKSTR_ZYON1_DEPTH_BACK)):
        with Locations((15, 515.979645309)):
            Circle(IZIM10_R)
    extrude(amount=KES_EKSTR_ZYON1_DEPTH + KES_EKSTR_ZYON1_DEPTH_BACK, mode=Mode.SUBTRACT)

    # Çizim12 → Döndür1 (revolve)
    with BuildSketch(Plane.XY.offset(15), mode=Mode.PRIVATE) as d_nd_r1_sk:
        Polygon((1656.053816649, 515.979645309), (1656.053816649, 520.979645309), (1666.053816649, 520.979645309), (1786.053816649, 520.979645309), (1796.053816649, 520.979645309), (1796.053816649, 515.979645309), align=None)
    revolve(d_nd_r1_sk.sketch.rotate(Axis((1656.053816649, 515.979645309, 15), (1, 0, 0)), 90), axis=Axis((1656.053816649, 515.979645309, 15), (1, 0, 0)))

    # Çizim14 → Yükseklik-Ekstrüzyon11 (add, two sides: drawn at the far end of the back side and taken through both)
    with BuildSketch(Plane.ZY.offset(-786.053816649).offset(-Y_KSEKLIK_EKSTR_ZYON11_DEPTH_BACK)):
        with Locations((15, 515.979645309)):
            Circle(IZIM14_R)
    extrude(amount=Y_KSEKLIK_EKSTR_ZYON11_DEPTH + Y_KSEKLIK_EKSTR_ZYON11_DEPTH_BACK)

    # Çizim16 → Yükseklik-Ekstrüzyon12 (add, two sides: drawn at the far end of the back side and taken through both)
    with BuildSketch(Plane.ZY.offset(1783.946183351).offset(-Y_KSEKLIK_EKSTR_ZYON12_DEPTH_BACK)):
        with Locations((15, 515.979645309)):
            Circle(IZIM16_R)
    extrude(amount=Y_KSEKLIK_EKSTR_ZYON12_DEPTH + Y_KSEKLIK_EKSTR_ZYON12_DEPTH_BACK)


solid = Compound([part.part, body_4.part, body_7.part, body_2_1.part])
